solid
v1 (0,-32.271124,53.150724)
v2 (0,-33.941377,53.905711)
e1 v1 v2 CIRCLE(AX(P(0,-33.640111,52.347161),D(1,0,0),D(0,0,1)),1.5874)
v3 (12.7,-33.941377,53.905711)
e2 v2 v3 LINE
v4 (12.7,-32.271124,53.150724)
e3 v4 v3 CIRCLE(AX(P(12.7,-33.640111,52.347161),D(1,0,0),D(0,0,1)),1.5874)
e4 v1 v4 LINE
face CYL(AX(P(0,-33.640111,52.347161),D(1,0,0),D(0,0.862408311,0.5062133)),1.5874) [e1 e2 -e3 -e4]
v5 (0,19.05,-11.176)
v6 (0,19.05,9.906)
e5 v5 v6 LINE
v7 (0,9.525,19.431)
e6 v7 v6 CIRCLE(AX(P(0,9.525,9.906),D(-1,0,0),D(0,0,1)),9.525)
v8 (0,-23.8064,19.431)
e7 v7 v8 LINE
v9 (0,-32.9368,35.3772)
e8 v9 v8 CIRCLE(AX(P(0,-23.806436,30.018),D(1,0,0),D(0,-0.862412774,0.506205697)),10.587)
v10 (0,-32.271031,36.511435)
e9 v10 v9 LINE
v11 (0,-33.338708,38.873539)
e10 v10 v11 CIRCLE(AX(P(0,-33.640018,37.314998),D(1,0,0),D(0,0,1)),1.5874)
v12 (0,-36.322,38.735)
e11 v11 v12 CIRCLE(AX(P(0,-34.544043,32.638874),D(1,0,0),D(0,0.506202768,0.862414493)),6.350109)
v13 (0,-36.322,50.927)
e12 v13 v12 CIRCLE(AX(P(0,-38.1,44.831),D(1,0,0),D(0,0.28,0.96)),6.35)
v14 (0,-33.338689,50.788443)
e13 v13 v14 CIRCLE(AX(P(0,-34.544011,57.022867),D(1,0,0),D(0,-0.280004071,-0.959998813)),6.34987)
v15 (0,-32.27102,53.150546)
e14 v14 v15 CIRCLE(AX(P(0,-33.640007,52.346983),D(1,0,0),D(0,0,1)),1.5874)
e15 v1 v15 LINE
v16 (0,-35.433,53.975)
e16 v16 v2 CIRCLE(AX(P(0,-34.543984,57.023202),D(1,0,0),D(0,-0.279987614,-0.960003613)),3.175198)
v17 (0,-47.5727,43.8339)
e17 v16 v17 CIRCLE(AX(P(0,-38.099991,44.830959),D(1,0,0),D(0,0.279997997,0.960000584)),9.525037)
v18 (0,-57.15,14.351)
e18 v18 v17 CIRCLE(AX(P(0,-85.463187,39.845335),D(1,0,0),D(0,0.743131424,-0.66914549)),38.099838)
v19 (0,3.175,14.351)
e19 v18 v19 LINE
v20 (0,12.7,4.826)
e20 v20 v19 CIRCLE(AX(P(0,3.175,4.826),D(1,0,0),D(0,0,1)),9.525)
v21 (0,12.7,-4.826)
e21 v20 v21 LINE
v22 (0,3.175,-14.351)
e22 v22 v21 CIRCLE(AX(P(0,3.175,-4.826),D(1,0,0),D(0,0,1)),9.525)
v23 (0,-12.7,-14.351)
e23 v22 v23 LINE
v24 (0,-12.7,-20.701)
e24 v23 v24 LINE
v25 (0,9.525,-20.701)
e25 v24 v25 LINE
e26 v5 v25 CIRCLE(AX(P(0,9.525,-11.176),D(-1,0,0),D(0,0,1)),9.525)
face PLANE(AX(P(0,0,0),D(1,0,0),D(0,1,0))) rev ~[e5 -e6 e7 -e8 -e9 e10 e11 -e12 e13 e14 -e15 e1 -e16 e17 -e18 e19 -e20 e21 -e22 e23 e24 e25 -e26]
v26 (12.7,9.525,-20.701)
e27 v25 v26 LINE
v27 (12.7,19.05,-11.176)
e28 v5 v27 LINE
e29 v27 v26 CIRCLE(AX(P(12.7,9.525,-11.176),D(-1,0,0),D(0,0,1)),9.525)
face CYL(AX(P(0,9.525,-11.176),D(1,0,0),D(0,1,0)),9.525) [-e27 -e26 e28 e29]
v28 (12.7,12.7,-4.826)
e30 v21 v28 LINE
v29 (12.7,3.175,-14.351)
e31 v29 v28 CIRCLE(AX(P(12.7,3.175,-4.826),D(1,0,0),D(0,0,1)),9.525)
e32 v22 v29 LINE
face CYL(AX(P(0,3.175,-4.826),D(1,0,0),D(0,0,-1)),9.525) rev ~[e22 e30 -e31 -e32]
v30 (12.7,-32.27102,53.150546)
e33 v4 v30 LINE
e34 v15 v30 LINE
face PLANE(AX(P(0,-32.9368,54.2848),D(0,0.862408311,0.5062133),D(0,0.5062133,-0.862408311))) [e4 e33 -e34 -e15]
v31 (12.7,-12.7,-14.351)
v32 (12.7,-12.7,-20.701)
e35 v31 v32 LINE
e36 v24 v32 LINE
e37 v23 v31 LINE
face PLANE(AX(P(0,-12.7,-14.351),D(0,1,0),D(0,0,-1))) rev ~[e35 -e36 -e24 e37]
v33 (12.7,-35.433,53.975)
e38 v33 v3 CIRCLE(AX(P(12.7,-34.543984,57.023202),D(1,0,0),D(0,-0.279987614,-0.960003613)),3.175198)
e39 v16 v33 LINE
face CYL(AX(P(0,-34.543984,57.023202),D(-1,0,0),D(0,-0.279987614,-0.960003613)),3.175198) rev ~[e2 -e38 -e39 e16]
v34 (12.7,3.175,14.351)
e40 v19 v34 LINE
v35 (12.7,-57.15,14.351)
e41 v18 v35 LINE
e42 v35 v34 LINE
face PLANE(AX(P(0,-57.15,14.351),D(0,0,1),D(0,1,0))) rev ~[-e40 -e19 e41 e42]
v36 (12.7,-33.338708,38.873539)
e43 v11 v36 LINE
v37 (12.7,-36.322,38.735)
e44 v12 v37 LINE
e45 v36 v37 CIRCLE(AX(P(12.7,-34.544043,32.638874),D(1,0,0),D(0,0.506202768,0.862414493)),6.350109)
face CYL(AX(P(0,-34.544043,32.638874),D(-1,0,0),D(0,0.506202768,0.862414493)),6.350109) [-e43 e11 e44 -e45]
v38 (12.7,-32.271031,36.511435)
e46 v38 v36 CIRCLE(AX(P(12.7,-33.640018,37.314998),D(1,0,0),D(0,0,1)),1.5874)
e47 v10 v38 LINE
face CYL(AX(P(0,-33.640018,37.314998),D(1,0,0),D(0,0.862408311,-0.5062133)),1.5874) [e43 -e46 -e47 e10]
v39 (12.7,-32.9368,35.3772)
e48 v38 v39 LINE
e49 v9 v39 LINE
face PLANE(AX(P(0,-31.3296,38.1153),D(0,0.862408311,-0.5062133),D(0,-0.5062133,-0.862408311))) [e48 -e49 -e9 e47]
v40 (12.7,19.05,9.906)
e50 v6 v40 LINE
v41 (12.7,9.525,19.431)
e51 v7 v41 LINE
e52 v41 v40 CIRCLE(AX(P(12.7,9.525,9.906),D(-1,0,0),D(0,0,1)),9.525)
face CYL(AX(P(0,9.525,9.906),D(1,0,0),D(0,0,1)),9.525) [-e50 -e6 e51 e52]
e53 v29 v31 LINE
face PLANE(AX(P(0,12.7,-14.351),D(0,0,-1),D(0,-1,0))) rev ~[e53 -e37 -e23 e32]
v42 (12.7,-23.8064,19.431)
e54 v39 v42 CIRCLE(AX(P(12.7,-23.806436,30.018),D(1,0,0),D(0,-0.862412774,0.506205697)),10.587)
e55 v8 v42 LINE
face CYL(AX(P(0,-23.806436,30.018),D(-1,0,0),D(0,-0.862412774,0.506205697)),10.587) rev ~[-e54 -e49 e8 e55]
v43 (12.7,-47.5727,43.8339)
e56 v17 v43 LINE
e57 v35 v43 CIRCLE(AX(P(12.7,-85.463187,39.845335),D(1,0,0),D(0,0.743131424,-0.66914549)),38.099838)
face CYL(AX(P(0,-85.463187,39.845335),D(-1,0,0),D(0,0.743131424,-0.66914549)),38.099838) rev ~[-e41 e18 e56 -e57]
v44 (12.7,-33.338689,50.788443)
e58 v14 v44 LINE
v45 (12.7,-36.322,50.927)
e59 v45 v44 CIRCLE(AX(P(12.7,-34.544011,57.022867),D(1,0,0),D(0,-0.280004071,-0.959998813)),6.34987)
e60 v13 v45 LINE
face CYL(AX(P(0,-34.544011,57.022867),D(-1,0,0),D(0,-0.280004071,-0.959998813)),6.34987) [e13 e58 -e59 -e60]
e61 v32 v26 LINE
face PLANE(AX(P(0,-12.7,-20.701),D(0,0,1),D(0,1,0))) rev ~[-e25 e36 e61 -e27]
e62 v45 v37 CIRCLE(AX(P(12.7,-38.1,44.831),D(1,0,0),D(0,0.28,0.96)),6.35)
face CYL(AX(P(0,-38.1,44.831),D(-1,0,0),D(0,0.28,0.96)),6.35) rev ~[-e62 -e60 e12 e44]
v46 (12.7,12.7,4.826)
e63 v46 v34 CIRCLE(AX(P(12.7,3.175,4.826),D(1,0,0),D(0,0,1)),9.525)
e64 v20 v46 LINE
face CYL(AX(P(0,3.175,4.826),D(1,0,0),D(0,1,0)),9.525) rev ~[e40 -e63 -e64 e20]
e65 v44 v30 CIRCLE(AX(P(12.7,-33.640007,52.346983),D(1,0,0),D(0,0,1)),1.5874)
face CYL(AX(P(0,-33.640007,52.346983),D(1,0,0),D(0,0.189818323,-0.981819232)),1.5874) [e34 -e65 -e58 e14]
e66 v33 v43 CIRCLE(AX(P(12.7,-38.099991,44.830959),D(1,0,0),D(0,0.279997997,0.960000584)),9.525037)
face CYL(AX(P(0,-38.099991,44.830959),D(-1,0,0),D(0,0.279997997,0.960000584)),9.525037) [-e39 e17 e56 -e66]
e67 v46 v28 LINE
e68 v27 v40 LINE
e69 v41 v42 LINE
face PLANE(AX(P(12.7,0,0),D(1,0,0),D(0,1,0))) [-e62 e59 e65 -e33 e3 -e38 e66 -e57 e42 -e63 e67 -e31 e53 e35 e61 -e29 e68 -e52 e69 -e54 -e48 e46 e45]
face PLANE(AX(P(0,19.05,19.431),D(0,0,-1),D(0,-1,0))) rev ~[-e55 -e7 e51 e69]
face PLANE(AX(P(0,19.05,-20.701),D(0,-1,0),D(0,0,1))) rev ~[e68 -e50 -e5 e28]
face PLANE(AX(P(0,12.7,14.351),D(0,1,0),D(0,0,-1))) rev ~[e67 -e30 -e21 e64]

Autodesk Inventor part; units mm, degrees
ref_plane "YZ Plane" through (0, 0, 0) normal (1, 0, 0) x (0, 1, 0)
ref_plane "XZ Plane" through (0, 0, 0) normal (0, 1, 0) x (-1, 0, 0)
ref_plane "XY Plane" through (0, 0, 0) normal (0, 0, 1) x (1, 0, 0)
sketch "Sketch1" plane through (0, 0, 0) normal (1, 0, 0) x (0, 1, 0)
  line L0 (-57.15, 14.351) -> (12.7, 14.351)
  line L1 (12.7, 14.351) -> (12.7, -14.351)
  line L2 (12.7, -14.351) -> (-12.7, -14.351)
  line L3 (-12.7, -14.351) -> (-12.7, -20.701)
  line L4 (-12.7, -20.701) -> (19.05, -20.701)
  line L5 (19.05, -20.701) -> (19.05, 19.431)
  line L6 (19.05, 19.431) -> (-23.8064, 19.431)
  arc A0 (-36.322, 50.927) -> (-36.322, 38.735) centre (-38.1, 44.831) ccw
  arc A1 (-36.322, 50.927) -> (-31.3296, 51.5467) centre (-34.544, 57.023) ccw
  arc A2 (-35.433, 53.975) -> (-47.5727, 43.8339) centre (-38.1, 44.831) ccw
  arc A3 (-57.15, 14.351) -> (-47.5727, 43.8339) centre (-85.4633, 39.8454) ccw
  arc A4 (-35.433, 53.975) -> (-32.9368, 54.2848) centre (-34.544, 57.023) ccw
  line L7 (-32.9368, 54.2848) -> (-31.3296, 51.5467)
  arc A5 (-31.3296, 38.1153) -> (-36.322, 38.735) centre (-34.544, 32.639) ccw
  line L8 (-31.3296, 38.1153) -> (-32.9368, 35.3772)
  line L9 (-38.1, 44.831) -> (-26.6352, 44.831) construction
  arc A6 (-32.9368, 35.3772) -> (-23.8064, 19.431) centre (-23.8064, 30.018) ccw
  point P0 (0, 0)
  point P1 (12.7, 0)
  dimension "d0" = 5.08
  dimension "d1" = 3.175
  dimension "d2" = 38.1
  dimension "d3" = 6.35
  dimension "d5" = 6.35
  dimension "d7" = 50.8
  dimension "d8" = 6.35
  dimension "d9" = 6.35
  dimension "d11" = 19.05
  dimension "d12" = 12.7
  dimension "d13" = 25.4
  dimension "d14" = 28.702
  dimension "d15" = 6.35
  dimension "d16" = 12.192
  dimension "d17" = 25.4
extrude "Extrusion1" add sketch "Sketch1" along normal blind 12.7
fillet "Fillet1" radius 9.525 4 edges at (6.35, 12.7, 14.351) (6.35, 12.7, -14.351) (6.35, 19.05, 19.431) (6.35, 19.05, -20.701)
fillet "Fillet2" radius 1.5875 3 edges at (6.35, -31.3296, 51.5467) (6.35, -32.9368, 54.2848) (6.35, -31.3296, 38.1153)
equation "\"d15\" = d3"
equation "\"d16\" = 1.92 * d5"
properties part number "Curtain Adapter"
